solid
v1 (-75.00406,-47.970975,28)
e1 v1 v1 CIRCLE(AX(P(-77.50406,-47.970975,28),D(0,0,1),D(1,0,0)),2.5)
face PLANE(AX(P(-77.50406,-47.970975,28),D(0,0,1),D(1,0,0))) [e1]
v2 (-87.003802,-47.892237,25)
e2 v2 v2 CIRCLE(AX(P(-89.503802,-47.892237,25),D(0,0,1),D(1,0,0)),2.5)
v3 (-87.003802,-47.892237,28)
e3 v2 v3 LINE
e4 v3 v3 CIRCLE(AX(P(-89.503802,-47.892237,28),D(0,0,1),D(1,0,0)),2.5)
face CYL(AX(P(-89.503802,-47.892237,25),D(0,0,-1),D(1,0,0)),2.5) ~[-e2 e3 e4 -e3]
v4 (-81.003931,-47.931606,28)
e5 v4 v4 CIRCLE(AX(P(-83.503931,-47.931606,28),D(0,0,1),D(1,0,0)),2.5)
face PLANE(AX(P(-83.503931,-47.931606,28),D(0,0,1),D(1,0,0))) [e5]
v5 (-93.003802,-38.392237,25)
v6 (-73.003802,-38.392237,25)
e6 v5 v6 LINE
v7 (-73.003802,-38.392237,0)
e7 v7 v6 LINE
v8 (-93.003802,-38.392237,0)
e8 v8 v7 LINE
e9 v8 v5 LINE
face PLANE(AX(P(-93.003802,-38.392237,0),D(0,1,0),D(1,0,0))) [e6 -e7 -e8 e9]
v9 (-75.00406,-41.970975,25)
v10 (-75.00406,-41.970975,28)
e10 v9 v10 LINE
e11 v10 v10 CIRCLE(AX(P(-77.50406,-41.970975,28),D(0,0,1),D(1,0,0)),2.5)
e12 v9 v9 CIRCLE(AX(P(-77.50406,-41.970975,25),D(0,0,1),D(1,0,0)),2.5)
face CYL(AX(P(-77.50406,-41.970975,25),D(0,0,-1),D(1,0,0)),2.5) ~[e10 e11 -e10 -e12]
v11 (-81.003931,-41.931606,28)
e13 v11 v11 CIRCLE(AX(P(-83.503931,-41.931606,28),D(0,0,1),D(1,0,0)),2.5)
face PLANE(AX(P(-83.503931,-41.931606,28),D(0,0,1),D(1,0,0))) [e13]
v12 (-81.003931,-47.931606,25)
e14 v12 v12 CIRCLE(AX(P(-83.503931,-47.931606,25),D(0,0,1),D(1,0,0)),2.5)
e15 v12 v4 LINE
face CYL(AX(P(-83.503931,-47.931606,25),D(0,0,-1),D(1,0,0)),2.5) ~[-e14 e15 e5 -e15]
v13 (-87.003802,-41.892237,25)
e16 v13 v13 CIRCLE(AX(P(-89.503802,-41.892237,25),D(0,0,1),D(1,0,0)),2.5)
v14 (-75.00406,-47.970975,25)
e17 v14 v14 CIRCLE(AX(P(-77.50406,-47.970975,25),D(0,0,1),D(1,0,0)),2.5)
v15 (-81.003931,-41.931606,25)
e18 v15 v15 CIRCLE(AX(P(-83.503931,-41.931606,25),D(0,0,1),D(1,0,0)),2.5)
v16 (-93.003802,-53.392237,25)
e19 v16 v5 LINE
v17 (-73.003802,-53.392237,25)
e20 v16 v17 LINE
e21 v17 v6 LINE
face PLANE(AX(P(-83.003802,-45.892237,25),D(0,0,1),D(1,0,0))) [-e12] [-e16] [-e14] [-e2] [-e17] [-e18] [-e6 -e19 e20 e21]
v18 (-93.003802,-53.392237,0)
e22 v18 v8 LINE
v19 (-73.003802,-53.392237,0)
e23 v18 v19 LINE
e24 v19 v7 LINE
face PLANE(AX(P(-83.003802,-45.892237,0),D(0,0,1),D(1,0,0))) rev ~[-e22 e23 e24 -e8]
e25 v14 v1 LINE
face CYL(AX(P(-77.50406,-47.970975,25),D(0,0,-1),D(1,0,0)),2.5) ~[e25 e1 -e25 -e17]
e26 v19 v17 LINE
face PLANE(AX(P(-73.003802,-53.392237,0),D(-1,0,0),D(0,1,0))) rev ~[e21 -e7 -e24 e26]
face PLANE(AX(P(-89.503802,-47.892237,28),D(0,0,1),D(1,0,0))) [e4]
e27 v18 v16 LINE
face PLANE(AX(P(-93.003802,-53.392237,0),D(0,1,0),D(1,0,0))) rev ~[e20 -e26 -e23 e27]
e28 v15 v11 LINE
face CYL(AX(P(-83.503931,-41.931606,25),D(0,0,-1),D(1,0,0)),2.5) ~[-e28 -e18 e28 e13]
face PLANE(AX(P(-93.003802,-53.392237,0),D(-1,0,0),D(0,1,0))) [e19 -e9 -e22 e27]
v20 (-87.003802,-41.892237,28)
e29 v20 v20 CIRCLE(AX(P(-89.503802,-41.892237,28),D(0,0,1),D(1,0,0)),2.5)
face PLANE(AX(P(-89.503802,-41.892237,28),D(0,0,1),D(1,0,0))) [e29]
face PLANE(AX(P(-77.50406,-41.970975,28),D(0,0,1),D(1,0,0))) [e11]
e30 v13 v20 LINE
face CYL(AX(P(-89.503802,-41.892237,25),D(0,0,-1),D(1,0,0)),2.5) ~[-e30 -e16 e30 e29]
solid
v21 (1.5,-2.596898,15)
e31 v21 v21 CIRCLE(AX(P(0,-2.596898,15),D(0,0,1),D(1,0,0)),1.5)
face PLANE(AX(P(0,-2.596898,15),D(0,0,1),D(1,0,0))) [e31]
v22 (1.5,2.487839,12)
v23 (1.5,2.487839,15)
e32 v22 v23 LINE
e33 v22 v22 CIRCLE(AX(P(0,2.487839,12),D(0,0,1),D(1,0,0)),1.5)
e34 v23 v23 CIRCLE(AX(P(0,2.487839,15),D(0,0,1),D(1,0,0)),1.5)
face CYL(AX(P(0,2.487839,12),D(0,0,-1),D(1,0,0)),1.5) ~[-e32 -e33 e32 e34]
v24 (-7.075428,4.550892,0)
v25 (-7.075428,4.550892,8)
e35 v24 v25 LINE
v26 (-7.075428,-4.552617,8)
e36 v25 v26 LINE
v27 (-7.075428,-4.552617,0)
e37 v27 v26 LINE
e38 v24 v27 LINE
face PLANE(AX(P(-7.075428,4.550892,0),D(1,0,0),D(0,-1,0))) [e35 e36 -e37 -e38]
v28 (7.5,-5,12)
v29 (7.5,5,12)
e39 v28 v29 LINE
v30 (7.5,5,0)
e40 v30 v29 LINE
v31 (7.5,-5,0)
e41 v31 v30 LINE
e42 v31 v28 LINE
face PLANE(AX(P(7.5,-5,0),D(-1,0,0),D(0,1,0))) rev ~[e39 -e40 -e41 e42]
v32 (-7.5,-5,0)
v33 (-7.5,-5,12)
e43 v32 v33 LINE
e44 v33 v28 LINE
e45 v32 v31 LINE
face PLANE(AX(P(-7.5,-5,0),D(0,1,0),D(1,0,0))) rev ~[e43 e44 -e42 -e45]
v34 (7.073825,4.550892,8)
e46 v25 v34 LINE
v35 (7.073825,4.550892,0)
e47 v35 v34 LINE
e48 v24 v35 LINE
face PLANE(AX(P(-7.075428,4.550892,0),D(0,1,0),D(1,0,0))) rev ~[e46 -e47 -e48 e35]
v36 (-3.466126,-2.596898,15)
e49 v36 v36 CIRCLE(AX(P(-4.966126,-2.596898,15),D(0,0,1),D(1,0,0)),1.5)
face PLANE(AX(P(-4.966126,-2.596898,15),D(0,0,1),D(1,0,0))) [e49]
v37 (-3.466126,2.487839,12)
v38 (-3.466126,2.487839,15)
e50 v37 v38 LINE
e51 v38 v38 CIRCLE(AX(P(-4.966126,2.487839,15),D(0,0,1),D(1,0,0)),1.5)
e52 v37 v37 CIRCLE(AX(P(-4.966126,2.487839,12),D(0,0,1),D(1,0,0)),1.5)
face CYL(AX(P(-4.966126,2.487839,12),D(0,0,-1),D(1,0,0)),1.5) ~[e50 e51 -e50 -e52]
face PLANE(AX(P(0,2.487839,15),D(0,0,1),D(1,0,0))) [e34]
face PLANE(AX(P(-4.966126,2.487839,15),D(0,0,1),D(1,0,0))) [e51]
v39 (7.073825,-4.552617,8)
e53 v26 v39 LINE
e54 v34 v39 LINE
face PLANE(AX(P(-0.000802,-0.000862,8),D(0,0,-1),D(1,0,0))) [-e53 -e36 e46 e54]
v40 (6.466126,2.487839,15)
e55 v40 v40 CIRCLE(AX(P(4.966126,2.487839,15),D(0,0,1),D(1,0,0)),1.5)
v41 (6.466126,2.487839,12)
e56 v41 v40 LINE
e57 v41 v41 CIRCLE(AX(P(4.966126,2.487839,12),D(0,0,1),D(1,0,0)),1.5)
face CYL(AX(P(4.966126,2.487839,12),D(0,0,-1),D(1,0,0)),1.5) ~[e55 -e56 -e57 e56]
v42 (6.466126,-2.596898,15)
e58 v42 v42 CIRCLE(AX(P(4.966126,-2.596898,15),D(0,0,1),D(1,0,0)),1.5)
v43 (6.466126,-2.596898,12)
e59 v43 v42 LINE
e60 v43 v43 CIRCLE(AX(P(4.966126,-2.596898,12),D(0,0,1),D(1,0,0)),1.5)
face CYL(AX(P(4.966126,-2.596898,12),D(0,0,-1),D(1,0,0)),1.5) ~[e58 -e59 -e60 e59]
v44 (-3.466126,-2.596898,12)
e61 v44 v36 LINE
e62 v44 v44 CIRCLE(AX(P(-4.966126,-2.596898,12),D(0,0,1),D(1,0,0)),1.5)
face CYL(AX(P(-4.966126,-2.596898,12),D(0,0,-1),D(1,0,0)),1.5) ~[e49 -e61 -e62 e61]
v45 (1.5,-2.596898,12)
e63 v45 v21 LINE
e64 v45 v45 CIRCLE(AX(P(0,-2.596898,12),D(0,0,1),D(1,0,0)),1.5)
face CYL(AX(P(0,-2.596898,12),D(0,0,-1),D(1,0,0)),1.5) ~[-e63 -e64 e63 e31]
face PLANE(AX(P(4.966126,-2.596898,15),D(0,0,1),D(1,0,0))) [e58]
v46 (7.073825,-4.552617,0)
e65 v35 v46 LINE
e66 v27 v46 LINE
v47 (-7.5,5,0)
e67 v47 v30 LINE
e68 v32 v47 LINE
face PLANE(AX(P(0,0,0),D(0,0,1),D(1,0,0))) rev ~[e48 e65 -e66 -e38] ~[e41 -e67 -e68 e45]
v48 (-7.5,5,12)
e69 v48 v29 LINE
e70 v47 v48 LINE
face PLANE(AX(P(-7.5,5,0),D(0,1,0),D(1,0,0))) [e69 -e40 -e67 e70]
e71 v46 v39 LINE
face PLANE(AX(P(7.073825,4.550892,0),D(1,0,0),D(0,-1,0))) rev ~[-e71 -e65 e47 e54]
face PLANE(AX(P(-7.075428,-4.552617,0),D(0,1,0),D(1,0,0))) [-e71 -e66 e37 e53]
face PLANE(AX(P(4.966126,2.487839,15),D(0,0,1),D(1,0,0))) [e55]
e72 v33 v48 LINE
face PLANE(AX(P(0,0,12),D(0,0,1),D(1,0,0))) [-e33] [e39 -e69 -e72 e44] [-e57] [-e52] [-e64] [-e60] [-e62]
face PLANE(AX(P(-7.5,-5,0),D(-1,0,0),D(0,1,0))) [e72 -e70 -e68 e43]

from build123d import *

# Parameters (mm, degrees)
F0_W     = 15
F0_H     = 10
F1_DEPTH = 12
F2_R     = 1.5
F3_DEPTH = 3
F4_W     = 20
F4_H     = 15
F5_DEPTH = 25
F6_R     = 2.5
F7_DEPTH = 3
F8_W     = 14.1492537223
F8_H     = 9.1035095975
F9_DEPTH = 8


# Not quite as in the source:
# - the program builds the solid bodies; features that only make, move or delete a surface that nothing else refers to are left out


with BuildPart() as f1:
    # F0 (on Top) → F1 (new body)
    with BuildSketch(Plane.XY):
        Rectangle(F0_W, F0_H)
    extrude(amount=F1_DEPTH)

    # F2 (on face) → F3 (join)
    with BuildSketch(Plane.XY.offset(12)):
        with Locations((-4.9661255717, -2.5968982129)):
            Circle(F2_R)
        with Locations((-4.9661255717, 2.4878393313)):
            Circle(F2_R)
        with Locations((0, 2.4878393313)):
            Circle(F2_R)
        with Locations((0, -2.5968982129)):
            Circle(F2_R)
        with Locations((4.9661255717, -2.5968982129)):
            Circle(F2_R)
        with Locations((4.9661255717, 2.4878393313)):
            Circle(F2_R)
    extrude(amount=F3_DEPTH)

    # F8 (on face) → F9 (cut)
    with BuildSketch(Plane(origin=(0, 0, 0), x_dir=(1, 0, 0), z_dir=(0, 0, -1))):
        with Locations((-0.0008016359, 0.0008624047)):
            Rectangle(F8_W, F8_H)
    extrude(amount=-F9_DEPTH, mode=Mode.SUBTRACT)


with BuildPart() as f5:
    # F4 (on Top) → F5 (new body)
    with BuildSketch(Plane.XY):
        with Locations((-83.0038021637, -45.8922367543)):
            Rectangle(F4_W, F4_H)
    extrude(amount=F5_DEPTH)

    # F6 (on face) → F7 (join)
    with BuildSketch(Plane.XY.offset(25)):
        with Locations((-89.5038021637, -47.8922367543)):
            Circle(F6_R)
        with Locations((-89.5038021637, -41.8922367543)):
            Circle(F6_R)
        with Locations((-83.5039313242, -47.9316056411)):
            Circle(F6_R)
        with Locations((-83.5039313242, -41.9316056411)):
            Circle(F6_R)
        with Locations((-77.5040604847, -47.9709745279)):
            Circle(F6_R)
        with Locations((-77.5040604847, -41.9709745279)):
            Circle(F6_R)
    extrude(amount=F7_DEPTH)


solid = Compound([f1.part, f5.part])
